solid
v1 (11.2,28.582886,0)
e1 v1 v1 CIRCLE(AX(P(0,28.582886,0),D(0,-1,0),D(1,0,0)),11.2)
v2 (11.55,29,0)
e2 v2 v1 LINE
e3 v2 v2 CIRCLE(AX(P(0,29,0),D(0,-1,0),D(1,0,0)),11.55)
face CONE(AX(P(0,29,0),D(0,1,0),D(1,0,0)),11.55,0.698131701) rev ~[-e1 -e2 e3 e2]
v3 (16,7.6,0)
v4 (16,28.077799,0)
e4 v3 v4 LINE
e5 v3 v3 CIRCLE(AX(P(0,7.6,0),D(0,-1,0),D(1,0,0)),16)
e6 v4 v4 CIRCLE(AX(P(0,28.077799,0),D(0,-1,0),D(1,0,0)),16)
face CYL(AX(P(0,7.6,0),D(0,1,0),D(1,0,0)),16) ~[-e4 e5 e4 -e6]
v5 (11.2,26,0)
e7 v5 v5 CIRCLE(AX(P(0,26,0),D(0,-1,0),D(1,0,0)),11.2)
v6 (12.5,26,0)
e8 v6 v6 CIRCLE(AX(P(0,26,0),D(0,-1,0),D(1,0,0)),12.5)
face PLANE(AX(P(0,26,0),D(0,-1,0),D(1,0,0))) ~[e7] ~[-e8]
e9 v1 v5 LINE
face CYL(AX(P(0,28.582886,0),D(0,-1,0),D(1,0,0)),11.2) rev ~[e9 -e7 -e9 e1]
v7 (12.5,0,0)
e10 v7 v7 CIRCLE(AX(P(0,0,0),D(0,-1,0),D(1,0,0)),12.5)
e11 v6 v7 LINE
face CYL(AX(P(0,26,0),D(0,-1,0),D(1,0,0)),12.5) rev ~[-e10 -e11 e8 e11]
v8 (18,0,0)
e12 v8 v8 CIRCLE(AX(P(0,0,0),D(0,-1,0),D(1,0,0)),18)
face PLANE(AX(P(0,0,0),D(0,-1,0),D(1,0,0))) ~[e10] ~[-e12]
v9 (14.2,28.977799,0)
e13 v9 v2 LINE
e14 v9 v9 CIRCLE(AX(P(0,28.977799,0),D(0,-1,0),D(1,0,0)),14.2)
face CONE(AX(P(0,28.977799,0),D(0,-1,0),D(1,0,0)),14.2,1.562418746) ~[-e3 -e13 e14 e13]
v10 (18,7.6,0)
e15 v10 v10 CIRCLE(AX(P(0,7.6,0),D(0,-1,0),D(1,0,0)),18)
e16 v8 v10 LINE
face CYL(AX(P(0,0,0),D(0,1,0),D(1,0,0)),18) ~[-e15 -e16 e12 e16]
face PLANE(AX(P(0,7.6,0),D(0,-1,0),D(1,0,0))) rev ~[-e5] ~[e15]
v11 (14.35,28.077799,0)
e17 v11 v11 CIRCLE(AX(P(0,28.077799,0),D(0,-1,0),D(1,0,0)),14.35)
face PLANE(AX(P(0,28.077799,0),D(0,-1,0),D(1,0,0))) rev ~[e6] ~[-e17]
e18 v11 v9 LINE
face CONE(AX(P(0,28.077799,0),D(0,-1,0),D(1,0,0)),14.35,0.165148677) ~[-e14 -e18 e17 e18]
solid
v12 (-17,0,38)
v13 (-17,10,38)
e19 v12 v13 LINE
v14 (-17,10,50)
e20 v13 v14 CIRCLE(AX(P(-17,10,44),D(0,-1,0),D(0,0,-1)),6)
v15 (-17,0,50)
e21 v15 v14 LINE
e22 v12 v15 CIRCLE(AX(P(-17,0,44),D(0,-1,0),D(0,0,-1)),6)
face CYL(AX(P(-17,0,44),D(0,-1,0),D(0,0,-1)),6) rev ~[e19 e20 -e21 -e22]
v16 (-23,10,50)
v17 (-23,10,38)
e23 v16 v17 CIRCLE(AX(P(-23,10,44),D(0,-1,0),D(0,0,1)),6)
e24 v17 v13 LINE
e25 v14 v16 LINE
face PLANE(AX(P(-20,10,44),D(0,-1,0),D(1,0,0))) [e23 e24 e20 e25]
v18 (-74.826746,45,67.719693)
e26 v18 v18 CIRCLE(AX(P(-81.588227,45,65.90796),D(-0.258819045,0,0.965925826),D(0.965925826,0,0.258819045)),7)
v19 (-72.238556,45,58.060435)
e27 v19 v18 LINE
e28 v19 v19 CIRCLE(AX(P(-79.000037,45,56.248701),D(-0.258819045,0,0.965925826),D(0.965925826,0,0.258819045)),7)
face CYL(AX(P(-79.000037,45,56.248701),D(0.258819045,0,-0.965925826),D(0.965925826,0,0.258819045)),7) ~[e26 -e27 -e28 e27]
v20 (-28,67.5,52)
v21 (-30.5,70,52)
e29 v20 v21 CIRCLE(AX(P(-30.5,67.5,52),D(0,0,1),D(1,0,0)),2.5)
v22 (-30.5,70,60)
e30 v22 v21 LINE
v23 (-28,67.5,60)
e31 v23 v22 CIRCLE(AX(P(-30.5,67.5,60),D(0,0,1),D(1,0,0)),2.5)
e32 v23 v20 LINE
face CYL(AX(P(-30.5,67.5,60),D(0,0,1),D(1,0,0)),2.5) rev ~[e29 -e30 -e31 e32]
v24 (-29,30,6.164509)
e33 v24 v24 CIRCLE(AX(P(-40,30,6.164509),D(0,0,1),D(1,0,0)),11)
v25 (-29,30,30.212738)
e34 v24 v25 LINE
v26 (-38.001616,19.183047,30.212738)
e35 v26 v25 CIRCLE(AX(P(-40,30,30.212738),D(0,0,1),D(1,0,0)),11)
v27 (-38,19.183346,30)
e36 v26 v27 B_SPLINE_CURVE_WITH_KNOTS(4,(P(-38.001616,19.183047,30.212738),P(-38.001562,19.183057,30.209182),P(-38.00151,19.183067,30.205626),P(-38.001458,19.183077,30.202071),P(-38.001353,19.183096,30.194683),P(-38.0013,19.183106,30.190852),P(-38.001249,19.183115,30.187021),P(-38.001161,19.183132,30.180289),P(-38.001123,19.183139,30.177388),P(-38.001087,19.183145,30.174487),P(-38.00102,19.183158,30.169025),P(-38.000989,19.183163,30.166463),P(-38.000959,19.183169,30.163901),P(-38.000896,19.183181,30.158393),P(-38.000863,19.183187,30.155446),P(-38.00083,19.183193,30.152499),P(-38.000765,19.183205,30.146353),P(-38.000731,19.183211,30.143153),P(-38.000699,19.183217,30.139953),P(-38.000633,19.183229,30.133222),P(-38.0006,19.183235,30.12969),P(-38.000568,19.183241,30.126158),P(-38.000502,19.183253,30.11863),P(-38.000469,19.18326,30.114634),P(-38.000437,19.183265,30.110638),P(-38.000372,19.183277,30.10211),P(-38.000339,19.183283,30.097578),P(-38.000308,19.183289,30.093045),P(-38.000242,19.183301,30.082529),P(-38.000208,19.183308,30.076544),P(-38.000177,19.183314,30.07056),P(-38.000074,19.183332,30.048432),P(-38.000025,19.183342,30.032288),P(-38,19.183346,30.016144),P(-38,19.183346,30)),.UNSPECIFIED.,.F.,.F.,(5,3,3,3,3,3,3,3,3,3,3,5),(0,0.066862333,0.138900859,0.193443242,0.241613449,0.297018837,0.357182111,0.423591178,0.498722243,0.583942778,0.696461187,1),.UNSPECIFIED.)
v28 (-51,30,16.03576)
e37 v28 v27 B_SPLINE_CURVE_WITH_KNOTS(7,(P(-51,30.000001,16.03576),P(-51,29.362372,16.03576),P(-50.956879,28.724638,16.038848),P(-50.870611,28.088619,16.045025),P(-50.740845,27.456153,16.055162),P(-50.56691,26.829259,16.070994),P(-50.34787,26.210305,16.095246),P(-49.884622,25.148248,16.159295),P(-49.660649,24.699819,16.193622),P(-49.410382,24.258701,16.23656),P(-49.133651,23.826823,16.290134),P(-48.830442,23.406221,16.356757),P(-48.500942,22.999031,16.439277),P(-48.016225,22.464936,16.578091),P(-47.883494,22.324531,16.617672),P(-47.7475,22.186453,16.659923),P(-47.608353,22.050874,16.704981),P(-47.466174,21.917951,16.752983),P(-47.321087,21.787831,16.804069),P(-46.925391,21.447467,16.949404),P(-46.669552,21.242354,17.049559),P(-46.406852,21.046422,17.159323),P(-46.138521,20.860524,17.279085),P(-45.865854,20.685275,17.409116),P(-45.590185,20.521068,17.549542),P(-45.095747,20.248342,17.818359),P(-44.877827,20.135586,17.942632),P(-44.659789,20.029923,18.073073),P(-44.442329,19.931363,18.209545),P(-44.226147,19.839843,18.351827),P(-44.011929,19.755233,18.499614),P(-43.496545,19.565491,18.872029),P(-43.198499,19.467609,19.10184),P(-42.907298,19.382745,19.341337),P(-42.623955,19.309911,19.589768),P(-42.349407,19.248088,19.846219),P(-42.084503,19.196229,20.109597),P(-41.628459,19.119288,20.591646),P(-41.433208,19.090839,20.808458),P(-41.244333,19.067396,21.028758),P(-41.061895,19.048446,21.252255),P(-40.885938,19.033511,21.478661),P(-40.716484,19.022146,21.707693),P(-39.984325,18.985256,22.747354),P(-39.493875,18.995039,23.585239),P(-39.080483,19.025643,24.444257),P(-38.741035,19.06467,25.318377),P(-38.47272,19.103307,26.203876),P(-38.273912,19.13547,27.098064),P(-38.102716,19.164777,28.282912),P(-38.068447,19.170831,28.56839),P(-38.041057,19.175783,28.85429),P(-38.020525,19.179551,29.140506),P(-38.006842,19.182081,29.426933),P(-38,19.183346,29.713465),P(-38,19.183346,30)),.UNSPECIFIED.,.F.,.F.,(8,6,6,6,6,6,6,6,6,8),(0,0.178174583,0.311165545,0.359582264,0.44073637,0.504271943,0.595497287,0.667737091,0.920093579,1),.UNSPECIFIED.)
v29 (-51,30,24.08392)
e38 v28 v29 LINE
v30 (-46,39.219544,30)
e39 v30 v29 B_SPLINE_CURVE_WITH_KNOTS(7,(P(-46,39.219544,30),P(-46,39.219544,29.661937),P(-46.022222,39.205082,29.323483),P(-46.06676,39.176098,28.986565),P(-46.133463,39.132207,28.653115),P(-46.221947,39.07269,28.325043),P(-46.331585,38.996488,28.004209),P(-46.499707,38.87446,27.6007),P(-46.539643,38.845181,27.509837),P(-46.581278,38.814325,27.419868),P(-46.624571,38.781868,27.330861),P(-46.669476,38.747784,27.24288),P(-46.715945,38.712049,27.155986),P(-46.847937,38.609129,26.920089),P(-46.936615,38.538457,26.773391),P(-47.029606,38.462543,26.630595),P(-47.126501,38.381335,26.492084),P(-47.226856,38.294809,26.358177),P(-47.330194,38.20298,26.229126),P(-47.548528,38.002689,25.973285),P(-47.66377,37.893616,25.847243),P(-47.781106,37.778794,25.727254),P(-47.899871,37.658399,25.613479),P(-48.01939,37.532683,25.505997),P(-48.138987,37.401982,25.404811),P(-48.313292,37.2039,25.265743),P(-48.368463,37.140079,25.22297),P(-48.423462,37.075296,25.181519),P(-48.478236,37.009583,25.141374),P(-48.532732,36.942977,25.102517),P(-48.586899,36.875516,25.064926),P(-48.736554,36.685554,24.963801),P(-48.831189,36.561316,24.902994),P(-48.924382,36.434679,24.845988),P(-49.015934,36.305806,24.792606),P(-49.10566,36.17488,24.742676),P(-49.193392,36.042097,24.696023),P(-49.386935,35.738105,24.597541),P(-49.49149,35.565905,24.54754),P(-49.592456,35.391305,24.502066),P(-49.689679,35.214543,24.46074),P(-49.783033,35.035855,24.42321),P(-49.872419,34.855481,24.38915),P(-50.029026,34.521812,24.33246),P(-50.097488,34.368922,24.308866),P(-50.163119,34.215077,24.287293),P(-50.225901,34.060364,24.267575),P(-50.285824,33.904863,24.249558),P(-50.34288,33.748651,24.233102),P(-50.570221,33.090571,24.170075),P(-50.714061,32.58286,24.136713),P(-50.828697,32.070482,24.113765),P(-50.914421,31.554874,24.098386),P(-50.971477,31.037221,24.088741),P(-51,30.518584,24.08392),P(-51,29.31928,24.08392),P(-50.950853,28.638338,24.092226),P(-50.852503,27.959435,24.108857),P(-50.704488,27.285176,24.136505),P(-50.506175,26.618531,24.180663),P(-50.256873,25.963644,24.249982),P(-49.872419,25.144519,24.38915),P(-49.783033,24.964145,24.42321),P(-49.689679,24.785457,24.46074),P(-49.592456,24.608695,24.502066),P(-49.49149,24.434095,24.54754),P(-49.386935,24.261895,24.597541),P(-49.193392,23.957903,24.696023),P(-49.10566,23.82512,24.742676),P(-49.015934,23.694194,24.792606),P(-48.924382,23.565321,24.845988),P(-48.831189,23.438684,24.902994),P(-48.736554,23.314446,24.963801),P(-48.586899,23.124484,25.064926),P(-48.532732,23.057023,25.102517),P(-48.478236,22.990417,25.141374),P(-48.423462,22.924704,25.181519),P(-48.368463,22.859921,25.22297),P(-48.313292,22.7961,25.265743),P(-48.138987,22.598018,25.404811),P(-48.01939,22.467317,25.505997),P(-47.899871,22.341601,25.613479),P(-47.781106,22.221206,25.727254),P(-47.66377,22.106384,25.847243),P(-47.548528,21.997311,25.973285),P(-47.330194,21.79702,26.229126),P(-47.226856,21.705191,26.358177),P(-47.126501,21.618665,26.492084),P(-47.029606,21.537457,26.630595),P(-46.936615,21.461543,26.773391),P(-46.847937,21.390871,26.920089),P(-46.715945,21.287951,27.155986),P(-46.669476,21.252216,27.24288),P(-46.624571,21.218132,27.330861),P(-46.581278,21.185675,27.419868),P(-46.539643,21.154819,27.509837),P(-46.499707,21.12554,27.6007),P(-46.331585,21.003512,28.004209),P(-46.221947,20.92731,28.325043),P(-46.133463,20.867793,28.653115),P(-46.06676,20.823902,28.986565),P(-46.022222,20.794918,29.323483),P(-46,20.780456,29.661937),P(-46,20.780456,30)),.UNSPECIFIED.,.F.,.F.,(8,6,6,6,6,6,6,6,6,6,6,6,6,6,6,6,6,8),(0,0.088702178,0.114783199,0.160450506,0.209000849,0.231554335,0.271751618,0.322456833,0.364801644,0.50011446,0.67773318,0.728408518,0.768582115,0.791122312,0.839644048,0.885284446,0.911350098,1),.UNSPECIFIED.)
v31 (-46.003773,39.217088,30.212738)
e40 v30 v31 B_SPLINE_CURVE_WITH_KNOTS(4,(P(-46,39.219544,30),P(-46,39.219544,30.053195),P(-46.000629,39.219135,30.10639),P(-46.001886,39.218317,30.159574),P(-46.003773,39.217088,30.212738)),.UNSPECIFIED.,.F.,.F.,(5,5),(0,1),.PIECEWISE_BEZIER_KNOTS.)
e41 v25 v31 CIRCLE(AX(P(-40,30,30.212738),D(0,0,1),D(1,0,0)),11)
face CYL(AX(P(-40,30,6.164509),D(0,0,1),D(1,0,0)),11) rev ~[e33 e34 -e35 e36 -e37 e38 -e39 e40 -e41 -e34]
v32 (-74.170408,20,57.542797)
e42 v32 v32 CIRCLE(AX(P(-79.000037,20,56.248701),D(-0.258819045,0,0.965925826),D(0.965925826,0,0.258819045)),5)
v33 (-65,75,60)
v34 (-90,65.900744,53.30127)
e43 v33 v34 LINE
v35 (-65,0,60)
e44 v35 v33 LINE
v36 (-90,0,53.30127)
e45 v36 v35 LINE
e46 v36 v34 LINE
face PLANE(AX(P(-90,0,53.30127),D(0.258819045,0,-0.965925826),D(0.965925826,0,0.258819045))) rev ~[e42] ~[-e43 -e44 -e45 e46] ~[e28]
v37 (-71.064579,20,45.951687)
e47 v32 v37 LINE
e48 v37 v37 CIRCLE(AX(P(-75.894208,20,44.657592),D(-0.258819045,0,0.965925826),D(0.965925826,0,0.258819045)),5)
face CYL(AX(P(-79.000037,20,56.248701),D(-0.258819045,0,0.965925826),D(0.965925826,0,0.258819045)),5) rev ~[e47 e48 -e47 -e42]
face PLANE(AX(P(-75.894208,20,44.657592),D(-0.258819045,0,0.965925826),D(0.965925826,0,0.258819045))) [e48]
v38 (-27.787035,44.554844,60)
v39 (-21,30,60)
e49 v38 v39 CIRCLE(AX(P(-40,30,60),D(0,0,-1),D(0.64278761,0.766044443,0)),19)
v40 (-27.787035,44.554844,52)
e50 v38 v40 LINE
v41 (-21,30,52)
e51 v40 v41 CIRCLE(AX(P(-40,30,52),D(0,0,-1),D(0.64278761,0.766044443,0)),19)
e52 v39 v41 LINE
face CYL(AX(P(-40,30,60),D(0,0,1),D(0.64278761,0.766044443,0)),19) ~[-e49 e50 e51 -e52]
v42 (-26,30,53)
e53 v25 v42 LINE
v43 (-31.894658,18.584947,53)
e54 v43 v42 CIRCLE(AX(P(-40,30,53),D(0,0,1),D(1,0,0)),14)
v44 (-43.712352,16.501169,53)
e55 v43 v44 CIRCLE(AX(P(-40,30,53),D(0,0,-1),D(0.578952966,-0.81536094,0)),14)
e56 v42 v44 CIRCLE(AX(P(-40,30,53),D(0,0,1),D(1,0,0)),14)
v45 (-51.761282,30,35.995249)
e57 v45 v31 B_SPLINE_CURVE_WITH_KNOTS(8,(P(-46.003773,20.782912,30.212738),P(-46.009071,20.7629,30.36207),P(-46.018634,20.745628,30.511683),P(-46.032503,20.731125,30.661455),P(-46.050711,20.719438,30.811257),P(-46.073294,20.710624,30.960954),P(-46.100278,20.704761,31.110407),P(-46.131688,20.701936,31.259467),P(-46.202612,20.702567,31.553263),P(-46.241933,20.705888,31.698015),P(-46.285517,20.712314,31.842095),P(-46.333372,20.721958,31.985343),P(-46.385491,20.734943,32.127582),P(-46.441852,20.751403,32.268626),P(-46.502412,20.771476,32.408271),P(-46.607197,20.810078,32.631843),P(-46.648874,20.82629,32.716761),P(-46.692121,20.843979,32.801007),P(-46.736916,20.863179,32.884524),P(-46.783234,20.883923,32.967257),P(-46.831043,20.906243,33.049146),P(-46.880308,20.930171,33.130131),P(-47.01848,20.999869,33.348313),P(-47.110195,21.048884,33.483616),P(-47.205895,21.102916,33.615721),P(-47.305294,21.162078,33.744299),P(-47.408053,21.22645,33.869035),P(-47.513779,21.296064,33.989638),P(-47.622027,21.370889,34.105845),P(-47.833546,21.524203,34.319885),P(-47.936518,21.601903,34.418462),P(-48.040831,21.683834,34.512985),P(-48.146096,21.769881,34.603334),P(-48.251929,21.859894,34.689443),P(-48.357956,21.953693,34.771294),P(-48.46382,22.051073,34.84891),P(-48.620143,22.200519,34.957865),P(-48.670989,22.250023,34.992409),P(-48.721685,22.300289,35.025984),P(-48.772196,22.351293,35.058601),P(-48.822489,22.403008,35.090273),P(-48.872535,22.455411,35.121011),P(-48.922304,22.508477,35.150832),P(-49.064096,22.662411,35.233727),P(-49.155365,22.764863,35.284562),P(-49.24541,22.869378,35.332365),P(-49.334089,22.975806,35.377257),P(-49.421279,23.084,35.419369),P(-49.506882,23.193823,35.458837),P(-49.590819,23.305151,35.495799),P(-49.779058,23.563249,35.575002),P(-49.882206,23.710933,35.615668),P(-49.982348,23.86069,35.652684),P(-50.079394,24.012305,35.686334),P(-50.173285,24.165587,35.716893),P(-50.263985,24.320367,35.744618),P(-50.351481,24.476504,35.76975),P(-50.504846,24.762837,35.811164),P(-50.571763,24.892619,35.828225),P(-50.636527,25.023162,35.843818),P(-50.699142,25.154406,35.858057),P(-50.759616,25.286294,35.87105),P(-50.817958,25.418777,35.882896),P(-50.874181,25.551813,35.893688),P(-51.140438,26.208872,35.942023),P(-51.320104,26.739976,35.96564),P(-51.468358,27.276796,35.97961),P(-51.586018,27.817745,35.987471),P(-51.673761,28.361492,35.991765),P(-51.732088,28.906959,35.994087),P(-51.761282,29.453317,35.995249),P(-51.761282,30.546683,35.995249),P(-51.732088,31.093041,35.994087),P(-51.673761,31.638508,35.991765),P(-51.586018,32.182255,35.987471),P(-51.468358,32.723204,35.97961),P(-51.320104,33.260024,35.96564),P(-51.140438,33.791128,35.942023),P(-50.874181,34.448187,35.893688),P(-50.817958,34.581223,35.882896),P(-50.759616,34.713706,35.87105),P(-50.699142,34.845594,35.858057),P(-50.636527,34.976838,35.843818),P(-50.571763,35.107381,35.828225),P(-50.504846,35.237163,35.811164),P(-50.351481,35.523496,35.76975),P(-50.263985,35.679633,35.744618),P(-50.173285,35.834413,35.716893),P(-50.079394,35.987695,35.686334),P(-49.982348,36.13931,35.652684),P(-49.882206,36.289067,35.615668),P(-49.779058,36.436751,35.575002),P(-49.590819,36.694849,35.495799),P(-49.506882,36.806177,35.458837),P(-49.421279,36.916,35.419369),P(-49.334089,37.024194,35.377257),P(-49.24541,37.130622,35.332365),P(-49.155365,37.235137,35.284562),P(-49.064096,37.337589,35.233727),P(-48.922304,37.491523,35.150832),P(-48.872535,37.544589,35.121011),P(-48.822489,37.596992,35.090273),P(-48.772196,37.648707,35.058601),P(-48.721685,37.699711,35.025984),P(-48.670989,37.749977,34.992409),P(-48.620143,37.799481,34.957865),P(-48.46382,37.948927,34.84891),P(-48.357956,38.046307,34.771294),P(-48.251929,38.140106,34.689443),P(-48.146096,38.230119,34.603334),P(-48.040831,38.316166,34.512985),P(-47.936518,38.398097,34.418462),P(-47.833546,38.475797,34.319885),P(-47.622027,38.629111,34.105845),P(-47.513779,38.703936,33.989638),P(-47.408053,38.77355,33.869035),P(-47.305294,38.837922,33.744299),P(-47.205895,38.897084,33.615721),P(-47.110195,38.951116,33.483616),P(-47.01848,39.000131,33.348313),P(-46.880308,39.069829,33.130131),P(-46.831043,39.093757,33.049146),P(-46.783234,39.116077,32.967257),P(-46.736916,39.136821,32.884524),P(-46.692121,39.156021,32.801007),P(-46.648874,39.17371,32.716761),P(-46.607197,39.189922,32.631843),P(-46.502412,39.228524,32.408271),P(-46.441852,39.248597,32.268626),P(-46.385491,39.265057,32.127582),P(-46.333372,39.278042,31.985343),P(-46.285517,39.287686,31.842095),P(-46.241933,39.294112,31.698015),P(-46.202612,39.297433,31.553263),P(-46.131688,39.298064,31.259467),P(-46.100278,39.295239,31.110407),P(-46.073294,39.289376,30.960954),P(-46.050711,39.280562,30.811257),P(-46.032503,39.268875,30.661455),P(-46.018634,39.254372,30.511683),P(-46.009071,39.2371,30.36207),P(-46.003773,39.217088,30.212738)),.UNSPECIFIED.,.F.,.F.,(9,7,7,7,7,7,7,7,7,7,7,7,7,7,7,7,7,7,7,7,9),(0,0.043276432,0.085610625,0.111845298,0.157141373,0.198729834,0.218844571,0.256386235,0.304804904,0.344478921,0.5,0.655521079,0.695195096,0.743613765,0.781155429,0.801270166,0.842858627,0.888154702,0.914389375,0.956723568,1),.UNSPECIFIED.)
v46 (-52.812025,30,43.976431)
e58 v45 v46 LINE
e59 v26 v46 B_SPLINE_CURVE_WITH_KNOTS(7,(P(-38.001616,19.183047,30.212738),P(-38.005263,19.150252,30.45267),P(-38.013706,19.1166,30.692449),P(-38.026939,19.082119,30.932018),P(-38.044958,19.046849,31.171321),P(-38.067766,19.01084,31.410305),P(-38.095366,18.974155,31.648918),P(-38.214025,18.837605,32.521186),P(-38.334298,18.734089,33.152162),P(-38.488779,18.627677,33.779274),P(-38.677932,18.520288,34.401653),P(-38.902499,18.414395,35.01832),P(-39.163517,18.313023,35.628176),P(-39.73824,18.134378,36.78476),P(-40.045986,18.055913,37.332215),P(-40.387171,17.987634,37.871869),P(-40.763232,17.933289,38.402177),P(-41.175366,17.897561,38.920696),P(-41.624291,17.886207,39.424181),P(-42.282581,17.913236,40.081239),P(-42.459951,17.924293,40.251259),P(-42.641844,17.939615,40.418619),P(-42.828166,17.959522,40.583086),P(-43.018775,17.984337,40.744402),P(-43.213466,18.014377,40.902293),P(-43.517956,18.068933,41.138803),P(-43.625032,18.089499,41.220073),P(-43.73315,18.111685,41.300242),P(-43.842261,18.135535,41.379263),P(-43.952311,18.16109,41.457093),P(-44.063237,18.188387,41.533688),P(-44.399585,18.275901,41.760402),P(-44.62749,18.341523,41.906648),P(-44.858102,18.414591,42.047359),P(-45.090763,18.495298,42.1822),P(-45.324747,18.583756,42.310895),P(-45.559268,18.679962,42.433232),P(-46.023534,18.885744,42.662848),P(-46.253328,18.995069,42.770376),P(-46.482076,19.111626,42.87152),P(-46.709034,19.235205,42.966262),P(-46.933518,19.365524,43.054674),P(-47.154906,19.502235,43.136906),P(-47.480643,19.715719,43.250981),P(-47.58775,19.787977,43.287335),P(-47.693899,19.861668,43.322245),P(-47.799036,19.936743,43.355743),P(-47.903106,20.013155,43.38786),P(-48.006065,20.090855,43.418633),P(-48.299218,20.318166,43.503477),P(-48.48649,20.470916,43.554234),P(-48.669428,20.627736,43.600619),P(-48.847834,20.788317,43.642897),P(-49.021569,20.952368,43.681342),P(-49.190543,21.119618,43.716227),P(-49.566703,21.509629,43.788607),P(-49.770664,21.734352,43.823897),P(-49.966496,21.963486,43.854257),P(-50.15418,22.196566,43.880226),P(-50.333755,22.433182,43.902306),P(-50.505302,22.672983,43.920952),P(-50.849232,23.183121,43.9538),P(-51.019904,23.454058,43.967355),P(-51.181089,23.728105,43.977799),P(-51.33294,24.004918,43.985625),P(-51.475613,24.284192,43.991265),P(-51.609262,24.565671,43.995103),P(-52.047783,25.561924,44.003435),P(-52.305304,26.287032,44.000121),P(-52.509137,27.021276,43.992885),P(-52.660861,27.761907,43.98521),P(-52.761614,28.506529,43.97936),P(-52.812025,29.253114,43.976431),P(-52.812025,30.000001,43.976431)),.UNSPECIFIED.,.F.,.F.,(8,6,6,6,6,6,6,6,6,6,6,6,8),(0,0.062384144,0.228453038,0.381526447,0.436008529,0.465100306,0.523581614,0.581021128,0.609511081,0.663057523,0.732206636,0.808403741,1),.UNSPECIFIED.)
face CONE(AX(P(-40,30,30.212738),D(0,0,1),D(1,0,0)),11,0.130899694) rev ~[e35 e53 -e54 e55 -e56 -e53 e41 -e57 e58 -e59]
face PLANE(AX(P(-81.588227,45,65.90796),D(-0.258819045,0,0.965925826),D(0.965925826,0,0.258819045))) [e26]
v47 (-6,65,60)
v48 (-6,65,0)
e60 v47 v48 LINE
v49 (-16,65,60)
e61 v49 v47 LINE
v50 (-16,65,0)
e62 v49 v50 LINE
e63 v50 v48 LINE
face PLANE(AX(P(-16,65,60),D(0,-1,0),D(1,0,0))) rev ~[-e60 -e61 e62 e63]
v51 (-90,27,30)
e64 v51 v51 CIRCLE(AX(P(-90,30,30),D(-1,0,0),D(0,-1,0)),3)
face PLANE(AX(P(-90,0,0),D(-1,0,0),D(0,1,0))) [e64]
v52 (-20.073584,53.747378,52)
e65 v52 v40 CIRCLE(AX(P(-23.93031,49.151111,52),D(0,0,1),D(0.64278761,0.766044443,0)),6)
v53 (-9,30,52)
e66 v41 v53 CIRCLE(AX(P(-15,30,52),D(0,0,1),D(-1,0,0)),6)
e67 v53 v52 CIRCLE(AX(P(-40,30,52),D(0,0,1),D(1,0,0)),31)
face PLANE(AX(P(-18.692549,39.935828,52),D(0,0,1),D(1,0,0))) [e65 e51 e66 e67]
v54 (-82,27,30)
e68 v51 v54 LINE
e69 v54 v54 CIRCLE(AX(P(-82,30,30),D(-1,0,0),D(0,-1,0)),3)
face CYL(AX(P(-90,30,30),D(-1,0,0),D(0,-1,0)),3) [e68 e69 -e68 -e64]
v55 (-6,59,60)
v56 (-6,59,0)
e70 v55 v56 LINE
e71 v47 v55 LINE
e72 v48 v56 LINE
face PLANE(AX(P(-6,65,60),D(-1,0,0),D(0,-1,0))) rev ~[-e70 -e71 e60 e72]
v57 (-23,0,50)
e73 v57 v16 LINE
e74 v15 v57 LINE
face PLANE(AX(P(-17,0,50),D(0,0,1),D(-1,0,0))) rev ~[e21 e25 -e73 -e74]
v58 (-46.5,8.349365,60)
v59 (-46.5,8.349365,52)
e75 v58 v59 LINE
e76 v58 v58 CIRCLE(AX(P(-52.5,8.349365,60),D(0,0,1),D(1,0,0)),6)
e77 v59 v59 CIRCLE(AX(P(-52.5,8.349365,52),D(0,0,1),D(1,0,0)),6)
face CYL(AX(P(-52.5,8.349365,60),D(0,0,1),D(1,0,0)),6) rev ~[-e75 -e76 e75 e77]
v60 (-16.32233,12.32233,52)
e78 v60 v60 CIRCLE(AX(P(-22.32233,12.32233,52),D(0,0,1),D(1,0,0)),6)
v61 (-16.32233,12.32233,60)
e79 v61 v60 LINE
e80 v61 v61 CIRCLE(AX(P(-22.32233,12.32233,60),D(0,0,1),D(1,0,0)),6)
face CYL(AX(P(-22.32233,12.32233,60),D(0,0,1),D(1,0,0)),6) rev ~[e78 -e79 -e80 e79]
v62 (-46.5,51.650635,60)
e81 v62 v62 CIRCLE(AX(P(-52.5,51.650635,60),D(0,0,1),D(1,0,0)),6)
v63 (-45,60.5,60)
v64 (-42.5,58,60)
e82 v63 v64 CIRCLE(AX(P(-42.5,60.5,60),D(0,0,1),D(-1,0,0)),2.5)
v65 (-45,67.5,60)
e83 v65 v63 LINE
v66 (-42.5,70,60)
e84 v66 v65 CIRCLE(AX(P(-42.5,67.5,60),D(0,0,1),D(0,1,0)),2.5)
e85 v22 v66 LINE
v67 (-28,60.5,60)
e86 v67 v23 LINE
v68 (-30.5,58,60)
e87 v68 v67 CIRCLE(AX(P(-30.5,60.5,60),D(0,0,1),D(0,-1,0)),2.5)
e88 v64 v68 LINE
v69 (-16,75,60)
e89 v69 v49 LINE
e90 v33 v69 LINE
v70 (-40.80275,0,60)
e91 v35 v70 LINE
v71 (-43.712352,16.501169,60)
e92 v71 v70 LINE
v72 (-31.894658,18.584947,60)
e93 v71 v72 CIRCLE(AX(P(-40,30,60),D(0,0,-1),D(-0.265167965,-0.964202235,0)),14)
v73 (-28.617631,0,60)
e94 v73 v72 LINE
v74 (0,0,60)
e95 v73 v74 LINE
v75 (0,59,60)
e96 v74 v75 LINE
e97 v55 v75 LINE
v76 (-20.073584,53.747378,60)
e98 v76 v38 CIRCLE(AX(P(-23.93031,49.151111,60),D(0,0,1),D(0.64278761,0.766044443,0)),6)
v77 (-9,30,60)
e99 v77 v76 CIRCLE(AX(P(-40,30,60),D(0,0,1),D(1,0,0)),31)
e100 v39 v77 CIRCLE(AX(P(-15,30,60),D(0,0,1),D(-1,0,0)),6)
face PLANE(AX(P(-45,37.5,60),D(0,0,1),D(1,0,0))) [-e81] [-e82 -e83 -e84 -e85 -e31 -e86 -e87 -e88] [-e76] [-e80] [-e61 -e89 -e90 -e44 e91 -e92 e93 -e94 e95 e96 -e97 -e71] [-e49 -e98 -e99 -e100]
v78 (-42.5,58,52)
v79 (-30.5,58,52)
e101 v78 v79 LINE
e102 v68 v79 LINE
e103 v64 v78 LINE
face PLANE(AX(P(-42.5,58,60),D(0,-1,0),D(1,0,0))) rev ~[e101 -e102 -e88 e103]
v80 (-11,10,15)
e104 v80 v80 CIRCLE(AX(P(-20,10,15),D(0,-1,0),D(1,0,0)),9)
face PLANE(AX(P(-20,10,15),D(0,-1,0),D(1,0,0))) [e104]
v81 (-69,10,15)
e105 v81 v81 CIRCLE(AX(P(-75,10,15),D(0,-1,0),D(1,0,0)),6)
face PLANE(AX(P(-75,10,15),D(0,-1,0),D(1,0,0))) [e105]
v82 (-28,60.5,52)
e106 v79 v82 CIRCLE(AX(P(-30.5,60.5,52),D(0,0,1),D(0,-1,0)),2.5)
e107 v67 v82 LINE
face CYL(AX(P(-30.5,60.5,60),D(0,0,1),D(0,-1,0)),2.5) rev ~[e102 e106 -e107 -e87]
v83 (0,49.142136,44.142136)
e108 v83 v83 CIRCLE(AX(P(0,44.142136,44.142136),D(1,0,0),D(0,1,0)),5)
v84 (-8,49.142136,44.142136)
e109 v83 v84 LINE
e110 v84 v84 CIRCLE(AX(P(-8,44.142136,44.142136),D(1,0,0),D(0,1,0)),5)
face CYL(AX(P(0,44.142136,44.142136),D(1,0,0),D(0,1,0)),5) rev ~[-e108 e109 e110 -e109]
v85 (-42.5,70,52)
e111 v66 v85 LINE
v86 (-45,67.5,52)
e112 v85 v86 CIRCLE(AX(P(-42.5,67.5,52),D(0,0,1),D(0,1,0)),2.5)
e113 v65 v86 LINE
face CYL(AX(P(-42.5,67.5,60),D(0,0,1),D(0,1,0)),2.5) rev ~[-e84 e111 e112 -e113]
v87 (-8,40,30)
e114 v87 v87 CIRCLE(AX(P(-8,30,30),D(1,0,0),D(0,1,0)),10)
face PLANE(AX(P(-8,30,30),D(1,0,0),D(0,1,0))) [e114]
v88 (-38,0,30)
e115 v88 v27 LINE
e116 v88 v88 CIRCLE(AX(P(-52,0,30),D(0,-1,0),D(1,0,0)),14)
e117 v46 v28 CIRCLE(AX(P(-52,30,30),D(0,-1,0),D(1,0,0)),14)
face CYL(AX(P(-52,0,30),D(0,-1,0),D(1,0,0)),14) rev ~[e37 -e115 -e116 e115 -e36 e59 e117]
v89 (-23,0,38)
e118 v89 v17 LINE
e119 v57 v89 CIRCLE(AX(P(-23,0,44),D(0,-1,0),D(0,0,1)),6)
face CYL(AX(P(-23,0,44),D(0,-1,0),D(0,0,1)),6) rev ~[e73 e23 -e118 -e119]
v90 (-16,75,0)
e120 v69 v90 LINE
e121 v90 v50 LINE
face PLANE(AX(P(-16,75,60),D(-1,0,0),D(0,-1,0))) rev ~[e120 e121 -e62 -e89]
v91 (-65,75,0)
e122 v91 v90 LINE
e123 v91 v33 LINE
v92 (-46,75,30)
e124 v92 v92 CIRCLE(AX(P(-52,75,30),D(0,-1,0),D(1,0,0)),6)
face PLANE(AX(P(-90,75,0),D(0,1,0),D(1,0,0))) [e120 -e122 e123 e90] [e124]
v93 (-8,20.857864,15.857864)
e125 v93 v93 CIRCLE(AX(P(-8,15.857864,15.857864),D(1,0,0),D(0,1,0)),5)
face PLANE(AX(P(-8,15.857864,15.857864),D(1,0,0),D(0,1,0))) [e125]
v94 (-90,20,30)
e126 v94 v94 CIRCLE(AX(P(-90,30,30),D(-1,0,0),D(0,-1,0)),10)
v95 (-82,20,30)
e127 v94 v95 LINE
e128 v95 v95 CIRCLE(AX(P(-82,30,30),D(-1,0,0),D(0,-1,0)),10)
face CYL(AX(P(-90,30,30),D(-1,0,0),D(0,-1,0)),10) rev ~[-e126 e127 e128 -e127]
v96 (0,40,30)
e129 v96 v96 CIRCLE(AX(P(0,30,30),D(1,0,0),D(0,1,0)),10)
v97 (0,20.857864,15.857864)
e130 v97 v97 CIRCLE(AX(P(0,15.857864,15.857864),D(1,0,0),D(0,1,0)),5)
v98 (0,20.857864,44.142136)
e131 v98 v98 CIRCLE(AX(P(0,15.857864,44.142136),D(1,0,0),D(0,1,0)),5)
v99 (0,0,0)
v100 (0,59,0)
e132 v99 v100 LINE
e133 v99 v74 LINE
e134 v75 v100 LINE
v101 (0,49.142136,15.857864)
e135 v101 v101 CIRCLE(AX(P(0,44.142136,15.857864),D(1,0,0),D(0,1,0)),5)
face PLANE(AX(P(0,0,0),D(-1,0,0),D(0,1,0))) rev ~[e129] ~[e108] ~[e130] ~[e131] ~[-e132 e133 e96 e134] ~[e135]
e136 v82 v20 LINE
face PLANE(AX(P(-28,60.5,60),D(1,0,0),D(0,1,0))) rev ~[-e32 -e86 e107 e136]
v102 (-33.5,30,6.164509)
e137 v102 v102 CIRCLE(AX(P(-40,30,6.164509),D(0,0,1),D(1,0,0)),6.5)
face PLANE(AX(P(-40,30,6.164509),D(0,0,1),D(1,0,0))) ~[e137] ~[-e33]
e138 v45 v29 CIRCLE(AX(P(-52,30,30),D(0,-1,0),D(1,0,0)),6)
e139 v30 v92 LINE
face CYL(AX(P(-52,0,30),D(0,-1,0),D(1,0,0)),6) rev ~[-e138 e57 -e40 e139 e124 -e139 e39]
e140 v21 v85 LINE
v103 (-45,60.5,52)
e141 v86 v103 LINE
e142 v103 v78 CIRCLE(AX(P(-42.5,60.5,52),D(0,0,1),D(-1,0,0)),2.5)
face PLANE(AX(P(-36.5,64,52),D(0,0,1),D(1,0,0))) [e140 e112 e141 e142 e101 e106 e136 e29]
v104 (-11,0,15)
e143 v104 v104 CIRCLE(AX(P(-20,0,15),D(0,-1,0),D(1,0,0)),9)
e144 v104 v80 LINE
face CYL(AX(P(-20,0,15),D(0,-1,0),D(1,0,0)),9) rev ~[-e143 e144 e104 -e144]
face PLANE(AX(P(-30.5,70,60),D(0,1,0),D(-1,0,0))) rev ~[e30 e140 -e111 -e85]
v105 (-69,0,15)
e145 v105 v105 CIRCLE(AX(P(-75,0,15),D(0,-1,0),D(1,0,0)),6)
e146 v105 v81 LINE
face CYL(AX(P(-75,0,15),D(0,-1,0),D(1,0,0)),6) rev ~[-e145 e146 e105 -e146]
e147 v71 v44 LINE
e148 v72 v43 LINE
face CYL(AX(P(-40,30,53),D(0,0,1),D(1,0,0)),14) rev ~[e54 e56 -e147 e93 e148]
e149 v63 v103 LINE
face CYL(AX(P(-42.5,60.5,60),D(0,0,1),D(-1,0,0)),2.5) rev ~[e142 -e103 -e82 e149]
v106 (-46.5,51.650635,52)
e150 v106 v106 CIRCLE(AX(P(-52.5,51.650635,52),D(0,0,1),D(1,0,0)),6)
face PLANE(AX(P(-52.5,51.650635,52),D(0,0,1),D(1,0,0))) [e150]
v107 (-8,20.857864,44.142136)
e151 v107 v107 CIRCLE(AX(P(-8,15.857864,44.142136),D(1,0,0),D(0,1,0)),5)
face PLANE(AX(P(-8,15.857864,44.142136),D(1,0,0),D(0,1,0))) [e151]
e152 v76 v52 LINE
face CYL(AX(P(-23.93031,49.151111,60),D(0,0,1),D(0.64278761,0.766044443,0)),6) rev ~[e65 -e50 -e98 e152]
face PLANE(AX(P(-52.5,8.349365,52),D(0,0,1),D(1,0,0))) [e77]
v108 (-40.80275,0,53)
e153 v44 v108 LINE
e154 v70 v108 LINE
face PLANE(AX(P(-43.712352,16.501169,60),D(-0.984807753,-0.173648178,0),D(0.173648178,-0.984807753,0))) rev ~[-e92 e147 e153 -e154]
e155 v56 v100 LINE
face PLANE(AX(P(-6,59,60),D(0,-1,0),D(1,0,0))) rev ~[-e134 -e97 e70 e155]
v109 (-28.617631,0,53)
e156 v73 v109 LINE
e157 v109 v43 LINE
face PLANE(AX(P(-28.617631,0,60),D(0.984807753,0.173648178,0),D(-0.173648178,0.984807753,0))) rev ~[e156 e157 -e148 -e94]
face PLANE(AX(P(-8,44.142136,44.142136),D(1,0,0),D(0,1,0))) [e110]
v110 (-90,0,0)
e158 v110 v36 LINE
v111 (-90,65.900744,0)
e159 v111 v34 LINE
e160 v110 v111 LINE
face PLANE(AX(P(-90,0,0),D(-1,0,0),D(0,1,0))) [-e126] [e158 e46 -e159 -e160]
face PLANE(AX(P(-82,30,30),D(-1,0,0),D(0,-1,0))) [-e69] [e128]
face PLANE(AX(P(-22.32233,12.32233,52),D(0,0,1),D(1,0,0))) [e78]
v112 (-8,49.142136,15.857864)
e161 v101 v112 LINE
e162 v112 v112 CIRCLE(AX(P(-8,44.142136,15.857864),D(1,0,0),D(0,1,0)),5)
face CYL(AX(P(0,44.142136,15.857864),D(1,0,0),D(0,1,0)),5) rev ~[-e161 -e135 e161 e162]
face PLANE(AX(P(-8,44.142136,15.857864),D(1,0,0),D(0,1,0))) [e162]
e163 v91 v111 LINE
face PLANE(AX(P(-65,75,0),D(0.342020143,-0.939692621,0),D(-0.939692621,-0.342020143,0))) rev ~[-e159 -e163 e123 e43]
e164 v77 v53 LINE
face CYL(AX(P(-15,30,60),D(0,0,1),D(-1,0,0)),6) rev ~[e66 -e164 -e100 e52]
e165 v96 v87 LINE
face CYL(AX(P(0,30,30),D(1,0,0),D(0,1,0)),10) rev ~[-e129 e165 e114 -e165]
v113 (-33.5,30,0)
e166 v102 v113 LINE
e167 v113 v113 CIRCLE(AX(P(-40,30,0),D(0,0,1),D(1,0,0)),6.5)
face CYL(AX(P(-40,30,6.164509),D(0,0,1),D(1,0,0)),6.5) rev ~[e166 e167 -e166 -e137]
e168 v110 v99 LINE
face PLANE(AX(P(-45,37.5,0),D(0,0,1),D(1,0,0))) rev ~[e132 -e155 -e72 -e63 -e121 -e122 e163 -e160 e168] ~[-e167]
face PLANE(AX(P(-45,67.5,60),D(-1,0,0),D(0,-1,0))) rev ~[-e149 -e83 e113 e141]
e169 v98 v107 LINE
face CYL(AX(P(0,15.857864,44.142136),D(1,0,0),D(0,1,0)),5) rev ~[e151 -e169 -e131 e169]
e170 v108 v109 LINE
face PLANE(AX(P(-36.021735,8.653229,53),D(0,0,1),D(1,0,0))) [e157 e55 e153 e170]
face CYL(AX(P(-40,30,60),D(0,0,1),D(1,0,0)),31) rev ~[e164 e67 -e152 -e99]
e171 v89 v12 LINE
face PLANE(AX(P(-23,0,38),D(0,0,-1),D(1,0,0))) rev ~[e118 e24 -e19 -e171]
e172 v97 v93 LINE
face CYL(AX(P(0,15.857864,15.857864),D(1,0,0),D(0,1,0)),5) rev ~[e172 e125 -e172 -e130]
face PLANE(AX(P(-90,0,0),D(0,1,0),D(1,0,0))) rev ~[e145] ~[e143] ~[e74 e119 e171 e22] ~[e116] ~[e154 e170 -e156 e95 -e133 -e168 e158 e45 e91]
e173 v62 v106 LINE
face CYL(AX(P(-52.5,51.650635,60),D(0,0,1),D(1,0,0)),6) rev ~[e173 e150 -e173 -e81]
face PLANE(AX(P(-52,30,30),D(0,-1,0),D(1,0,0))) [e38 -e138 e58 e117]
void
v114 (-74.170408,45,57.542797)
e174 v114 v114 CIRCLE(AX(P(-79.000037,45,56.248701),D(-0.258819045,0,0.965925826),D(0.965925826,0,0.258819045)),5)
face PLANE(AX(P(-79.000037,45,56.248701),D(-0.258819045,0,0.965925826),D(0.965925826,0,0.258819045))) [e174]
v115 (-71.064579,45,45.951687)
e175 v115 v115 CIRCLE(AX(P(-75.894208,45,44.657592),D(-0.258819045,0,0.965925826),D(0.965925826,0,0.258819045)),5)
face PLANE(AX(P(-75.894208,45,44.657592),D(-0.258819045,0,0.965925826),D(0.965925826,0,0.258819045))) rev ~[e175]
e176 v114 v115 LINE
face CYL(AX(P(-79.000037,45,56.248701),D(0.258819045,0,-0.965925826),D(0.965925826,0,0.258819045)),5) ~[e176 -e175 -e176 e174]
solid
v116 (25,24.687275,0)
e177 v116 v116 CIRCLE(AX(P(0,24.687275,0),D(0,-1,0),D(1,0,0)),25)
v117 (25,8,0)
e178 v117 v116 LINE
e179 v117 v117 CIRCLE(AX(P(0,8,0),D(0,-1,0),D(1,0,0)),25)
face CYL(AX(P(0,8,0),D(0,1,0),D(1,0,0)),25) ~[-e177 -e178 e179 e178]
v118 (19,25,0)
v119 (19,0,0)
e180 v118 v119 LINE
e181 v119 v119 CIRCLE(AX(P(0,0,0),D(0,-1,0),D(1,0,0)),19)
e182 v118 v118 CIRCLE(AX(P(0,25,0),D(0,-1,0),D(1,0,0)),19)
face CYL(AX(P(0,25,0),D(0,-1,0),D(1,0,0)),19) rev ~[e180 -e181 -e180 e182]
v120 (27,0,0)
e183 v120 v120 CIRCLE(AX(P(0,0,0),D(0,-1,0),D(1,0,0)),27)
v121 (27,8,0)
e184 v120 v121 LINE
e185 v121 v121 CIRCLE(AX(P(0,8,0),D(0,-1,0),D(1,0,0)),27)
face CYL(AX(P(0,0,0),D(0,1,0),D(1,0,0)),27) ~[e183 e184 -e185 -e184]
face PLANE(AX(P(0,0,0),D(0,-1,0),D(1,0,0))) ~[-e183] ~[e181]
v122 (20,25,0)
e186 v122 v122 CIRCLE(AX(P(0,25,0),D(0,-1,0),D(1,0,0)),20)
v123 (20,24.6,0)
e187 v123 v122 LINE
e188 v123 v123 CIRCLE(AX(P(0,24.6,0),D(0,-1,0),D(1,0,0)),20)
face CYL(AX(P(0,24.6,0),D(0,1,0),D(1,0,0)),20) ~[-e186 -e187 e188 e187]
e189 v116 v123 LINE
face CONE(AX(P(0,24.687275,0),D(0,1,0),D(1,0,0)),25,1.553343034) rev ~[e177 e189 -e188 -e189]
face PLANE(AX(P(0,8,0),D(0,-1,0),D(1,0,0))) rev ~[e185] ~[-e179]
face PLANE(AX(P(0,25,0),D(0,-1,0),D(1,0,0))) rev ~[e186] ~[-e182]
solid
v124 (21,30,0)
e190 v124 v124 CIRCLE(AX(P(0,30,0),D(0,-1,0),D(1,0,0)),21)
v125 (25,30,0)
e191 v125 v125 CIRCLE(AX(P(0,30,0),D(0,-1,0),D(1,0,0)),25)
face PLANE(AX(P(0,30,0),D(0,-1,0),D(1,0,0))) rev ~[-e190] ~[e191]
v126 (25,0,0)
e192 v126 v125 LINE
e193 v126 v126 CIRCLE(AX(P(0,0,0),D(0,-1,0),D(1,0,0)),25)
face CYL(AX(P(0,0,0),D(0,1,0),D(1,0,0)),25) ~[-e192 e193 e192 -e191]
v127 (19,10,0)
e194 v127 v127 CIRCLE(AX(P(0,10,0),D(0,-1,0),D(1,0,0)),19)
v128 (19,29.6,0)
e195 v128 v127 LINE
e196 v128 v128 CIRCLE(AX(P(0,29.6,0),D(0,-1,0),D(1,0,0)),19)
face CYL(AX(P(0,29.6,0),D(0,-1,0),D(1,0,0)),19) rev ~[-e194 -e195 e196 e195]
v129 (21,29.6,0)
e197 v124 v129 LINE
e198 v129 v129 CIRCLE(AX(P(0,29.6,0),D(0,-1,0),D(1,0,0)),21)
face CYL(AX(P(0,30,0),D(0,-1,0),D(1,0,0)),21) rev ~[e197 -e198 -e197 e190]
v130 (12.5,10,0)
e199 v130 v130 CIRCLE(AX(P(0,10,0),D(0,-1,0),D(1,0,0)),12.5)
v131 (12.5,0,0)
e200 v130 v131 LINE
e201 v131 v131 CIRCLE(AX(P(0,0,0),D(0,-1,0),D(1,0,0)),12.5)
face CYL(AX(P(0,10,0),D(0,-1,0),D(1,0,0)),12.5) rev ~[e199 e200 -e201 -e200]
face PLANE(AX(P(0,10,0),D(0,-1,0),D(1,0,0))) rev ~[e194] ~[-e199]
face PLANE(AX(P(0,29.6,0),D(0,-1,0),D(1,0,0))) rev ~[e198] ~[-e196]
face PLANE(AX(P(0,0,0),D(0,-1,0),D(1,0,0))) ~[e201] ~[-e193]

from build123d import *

# Parameters (mm, degrees)
F6_W      = 90
F6_H      = 75
F7_DEPTH  = 60
F9_DEPTH  = 75.001
F11_DEPTH = 87.001
F15_R     = 6.5
F16_DEPTH = 33.1655091949
F17_R     = 6
F18_DEPTH = 8
F20_DEPTH = 7
F22_DEPTH = 60.001
F24_DEPTH = 8
F26_DEPTH = 10
F28_DEPTH = 8
F29_R     = 9
F30_DEPTH = 10
F31_R     = 14
F31_R_2   = 6
F32_DEPTH = 30
F33_DEPTH = 75.001
F34_R     = 6
F35_DEPTH = 10
F36_R     = 10
F36_R_2   = 3
F37_DEPTH = 8
F38_R     = 10
F38_R_2   = 5
F39_DEPTH = 8
F40_R     = 5
F41_DEPTH = 12
F40_R_2   = 7
F42_DEPTH = 10
F43_DEPTH = 10


with BuildPart() as f1:
    # F0 (on Top) → F1 (revolve)
    with BuildSketch(Plane.XY):
        Polygon((12.5, 0), (14.1446864875, 0), (25, 0), (25, 30), (21, 30), (21, 29.6), (19, 29.6), (19, 10), (12.5, 10), align=None)
    revolve(axis=Axis((0, 18.6632340774, 0), (0, -1, 0)))


with BuildPart() as f3:
    # F2 (on Top) → F3 (revolve)
    with BuildSketch(Plane.XY):
        Polygon((19, 0), (27, 0), (27, 8), (25, 8), (25, 24.6872753246), (20, 24.6), (20, 25), (19, 25), align=None)
    revolve(axis=Axis((0, 13.7950675562, 0), (0, -1, 0)))


with BuildPart() as f5:
    # F4 (on Top) → F5 (revolve)
    with BuildSketch(Plane.XY):
        Polygon((12.5, 26), (12.5, 0), (18, 0), (18, 7.6), (16, 7.6), (16, 28.0777988925), (14.35, 28.0777988925), (14.2, 28.9777988925), (11.55, 29), (11.2, 28.5828862426), (11.2, 26), align=None)
    revolve(axis=Axis((0, 15.8516195952, 0), (0, -1, 0)))


with BuildPart() as f7:
    # F6 (on Top) → F7 (new body)
    with BuildSketch(Plane.XY):
        with Locations((-45, 37.5)):
            Rectangle(F6_W, F6_H)
    extrude(amount=F7_DEPTH)

    # F8 (on face) → F9 (cut, through all)
    with BuildSketch(Plane.XZ):
        Polygon((-90, 60), (-90, 53.3012701892), (-65, 60), align=None)
    extrude(amount=-F9_DEPTH, mode=Mode.SUBTRACT)

    # F10 (on face) → F11 (cut, through all)
    with BuildSketch(Plane.XY.offset(60)):
        Polygon((0, 75), (-16, 75), (-16, 65), (-6, 65), (-6, 59), (0, 59), align=None)
    extrude(amount=-F11_DEPTH, mode=Mode.SUBTRACT)

    # F13 (on offset) → F14 (revolve, cut)
    with BuildSketch(Plane.XZ.offset(-30)):
        Polygon((-26, 53), (-26, 60), (-40, 60), (-40, 6.1645091949), (-29, 6.1645091949), (-29, 30.2127376618), align=None)
    revolve(axis=Axis((-40, 30, 33.0822545975), (0, 0, 1)), mode=Mode.SUBTRACT)

    # F15 (on face) → F16 (cut, through all)
    with BuildSketch(Plane.XY.offset(6.1645091949)):
        with Locations((-40, 30)):
            Circle(F15_R)
    extrude(amount=-F16_DEPTH, mode=Mode.SUBTRACT)

    # F17 (on face) → F18 (cut)
    with BuildSketch(Plane.XY.offset(60)):
        with Locations((-52.5, 51.6506350946)):
            Circle(F17_R)
        with Locations((-52.5, 8.3493649054)):
            Circle(F17_R)
        with Locations((-22.3223304703, 12.3223304703)):
            Circle(F17_R)
    extrude(amount=-F18_DEPTH, mode=Mode.SUBTRACT)

    # F19 (on face) → F20 (cut)
    with BuildSketch(Plane.XY.offset(60)):
        with BuildLine():
            ThreePointArc((-31.8946584701, 18.5849468384), (-37.5689255127, 16.2126914578), (-43.7123515062, 16.5011687064))
            Line((-43.7123515062, 16.5011687064), (-40.8027502501, 0))
            Line((-40.8027502501, 0), (-28.6176309074, 0))
            Line((-28.6176309074, 0), (-31.8946584701, 18.5849468384))
        make_face()
    extrude(amount=-F20_DEPTH, mode=Mode.SUBTRACT)

    # F21 (on face) → F22 (cut, through all)
    with BuildSketch(Plane(origin=(0, 0, 0), x_dir=(1, 0, 0), z_dir=(0, 0, -1))):
        Polygon((-65, -75), (-90, -65.9007441433), (-90, -75), align=None)
    extrude(amount=-F22_DEPTH, mode=Mode.SUBTRACT)

    # F23 (on face) → F24 (cut)
    with BuildSketch(Plane.XY.offset(60)):
        with BuildLine():
            Line((-42.5, 58), (-30.5, 58))
            ThreePointArc((-30.5, 58), (-28.732233047, 58.732233047), (-28, 60.5))
            Line((-28, 60.5), (-28, 67.5))
            ThreePointArc((-28, 67.5), (-28.732233047, 69.267766953), (-30.5, 70))
            Line((-30.5, 70), (-42.5, 70))
            ThreePointArc((-42.5, 70), (-44.267766953, 69.267766953), (-45, 67.5))
            Line((-45, 67.5), (-45, 60.5))
            ThreePointArc((-45, 60.5), (-44.267766953, 58.732233047), (-42.5, 58))
        make_face()
    extrude(amount=-F24_DEPTH, mode=Mode.SUBTRACT)

    # F25 (on face) → F26 (cut)
    with BuildSketch(Plane.XZ):
        with BuildLine():
            Line((-23, 38), (-17, 38))
            ThreePointArc((-17, 38), (-11, 44), (-17, 50))
            Line((-17, 50), (-23, 50))
            ThreePointArc((-23, 50), (-29, 44), (-23, 38))
        make_face()
    extrude(amount=-F26_DEPTH, mode=Mode.SUBTRACT)

    # F27 (on face) → F28 (cut)
    with BuildSketch(Plane.XY.offset(60)):
        with BuildLine():
            ThreePointArc((-27.787035416, 44.5548444193), (-22.7801520463, 38.0297469731), (-21, 30))
            ThreePointArc((-21, 30), (-15, 24), (-9, 30))
            ThreePointArc((-9, 30), (-11.9044586019, 43.101166114), (-20.0735840997, 53.7473777367))
            ThreePointArc((-20.0735840997, 53.7473777367), (-28.5265764166, 53.0078367361), (-27.787035416, 44.5548444193))
        make_face()
    extrude(amount=-F28_DEPTH, mode=Mode.SUBTRACT)

    # F29 (on face) → F30 (cut)
    with BuildSketch(Plane.XZ):
        with Locations((-20, 15)):
            Circle(F29_R)
    extrude(amount=-F30_DEPTH, mode=Mode.SUBTRACT)

    # F31 (on face) → F32 (cut)
    with BuildSketch(Plane.XZ):
        with Locations((-52, 30)):
            Circle(F31_R)
        with Locations((-52, 30)):
            Circle(F31_R_2, mode=Mode.SUBTRACT)
    extrude(amount=-F32_DEPTH, mode=Mode.SUBTRACT)

    # F33 (cut, through all): a face of the model
    f33_faces = [f7.faces().sort_by_distance(p)[0] for p in [
        (-52, 0, 30),
    ]]
    extrude(f33_faces, amount=-F33_DEPTH, mode=Mode.SUBTRACT)

    # F34 (on face) → F35 (cut)
    with BuildSketch(Plane.XZ):
        with Locations((-75, 15)):
            Circle(F34_R)
    extrude(amount=-F35_DEPTH, mode=Mode.SUBTRACT)

    # F36 (on face) → F37 (cut)
    with BuildSketch(Plane(origin=(-90, 0, 0), x_dir=(0, -1, 0), z_dir=(-1, 0, 0))):
        with Locations((-30, 30)):
            Circle(F36_R)
        with Locations((-30, 30)):
            Circle(F36_R_2, mode=Mode.SUBTRACT)
    extrude(amount=-F37_DEPTH, mode=Mode.SUBTRACT)

    # F38 (on face) → F39 (cut)
    with BuildSketch(Plane.YZ):
        with Locations((30, 30)):
            Circle(F38_R)
        with Locations((15.8578643763, 44.1421356237)):
            Circle(F38_R_2)
        with Locations((44.1421356237, 44.1421356237)):
            Circle(F38_R_2)
        with Locations((44.1421356237, 15.8578643763)):
            Circle(F38_R_2)
        with Locations((15.8578643763, 15.8578643763)):
            Circle(F38_R_2)
    extrude(amount=-F39_DEPTH, mode=Mode.SUBTRACT)

    # F40 (on face) → F41 (cut)
    with BuildSketch(Plane(origin=(-19.354174377, 0, 72.2307621135), x_dir=(0.9659258263, 0, 0.2588190451), z_dir=(-0.2588190451, 0, 0.9659258263))):
        with Locations((-61.7499405129, 45)):
            Circle(F40_R)
        with Locations((-61.7499405129, 20)):
            Circle(F40_R)
    extrude(amount=-F41_DEPTH, mode=Mode.SUBTRACT)

    # F40 (on face) → F42 (join)
    with BuildSketch(Plane(origin=(-19.354174377, 0, 72.2307621135), x_dir=(0.9659258263, 0, 0.2588190451), z_dir=(-0.2588190451, 0, 0.9659258263))):
        with Locations((-61.7499405129, 45)):
            Circle(F40_R_2)
        with Locations((-61.7499405129, 45)):
            Circle(F40_R, mode=Mode.SUBTRACT)
    extrude(amount=F42_DEPTH)

    # F40 (on face) → F43 (join)
    with BuildSketch(Plane(origin=(-19.354174377, 0, 72.2307621135), x_dir=(0.9659258263, 0, 0.2588190451), z_dir=(-0.2588190451, 0, 0.9659258263))):
        with Locations((-61.7499405129, 45)):
            Circle(F40_R)
    extrude(amount=F43_DEPTH)


solid = Compound([f1.part, f3.part, f5.part, f7.part])
